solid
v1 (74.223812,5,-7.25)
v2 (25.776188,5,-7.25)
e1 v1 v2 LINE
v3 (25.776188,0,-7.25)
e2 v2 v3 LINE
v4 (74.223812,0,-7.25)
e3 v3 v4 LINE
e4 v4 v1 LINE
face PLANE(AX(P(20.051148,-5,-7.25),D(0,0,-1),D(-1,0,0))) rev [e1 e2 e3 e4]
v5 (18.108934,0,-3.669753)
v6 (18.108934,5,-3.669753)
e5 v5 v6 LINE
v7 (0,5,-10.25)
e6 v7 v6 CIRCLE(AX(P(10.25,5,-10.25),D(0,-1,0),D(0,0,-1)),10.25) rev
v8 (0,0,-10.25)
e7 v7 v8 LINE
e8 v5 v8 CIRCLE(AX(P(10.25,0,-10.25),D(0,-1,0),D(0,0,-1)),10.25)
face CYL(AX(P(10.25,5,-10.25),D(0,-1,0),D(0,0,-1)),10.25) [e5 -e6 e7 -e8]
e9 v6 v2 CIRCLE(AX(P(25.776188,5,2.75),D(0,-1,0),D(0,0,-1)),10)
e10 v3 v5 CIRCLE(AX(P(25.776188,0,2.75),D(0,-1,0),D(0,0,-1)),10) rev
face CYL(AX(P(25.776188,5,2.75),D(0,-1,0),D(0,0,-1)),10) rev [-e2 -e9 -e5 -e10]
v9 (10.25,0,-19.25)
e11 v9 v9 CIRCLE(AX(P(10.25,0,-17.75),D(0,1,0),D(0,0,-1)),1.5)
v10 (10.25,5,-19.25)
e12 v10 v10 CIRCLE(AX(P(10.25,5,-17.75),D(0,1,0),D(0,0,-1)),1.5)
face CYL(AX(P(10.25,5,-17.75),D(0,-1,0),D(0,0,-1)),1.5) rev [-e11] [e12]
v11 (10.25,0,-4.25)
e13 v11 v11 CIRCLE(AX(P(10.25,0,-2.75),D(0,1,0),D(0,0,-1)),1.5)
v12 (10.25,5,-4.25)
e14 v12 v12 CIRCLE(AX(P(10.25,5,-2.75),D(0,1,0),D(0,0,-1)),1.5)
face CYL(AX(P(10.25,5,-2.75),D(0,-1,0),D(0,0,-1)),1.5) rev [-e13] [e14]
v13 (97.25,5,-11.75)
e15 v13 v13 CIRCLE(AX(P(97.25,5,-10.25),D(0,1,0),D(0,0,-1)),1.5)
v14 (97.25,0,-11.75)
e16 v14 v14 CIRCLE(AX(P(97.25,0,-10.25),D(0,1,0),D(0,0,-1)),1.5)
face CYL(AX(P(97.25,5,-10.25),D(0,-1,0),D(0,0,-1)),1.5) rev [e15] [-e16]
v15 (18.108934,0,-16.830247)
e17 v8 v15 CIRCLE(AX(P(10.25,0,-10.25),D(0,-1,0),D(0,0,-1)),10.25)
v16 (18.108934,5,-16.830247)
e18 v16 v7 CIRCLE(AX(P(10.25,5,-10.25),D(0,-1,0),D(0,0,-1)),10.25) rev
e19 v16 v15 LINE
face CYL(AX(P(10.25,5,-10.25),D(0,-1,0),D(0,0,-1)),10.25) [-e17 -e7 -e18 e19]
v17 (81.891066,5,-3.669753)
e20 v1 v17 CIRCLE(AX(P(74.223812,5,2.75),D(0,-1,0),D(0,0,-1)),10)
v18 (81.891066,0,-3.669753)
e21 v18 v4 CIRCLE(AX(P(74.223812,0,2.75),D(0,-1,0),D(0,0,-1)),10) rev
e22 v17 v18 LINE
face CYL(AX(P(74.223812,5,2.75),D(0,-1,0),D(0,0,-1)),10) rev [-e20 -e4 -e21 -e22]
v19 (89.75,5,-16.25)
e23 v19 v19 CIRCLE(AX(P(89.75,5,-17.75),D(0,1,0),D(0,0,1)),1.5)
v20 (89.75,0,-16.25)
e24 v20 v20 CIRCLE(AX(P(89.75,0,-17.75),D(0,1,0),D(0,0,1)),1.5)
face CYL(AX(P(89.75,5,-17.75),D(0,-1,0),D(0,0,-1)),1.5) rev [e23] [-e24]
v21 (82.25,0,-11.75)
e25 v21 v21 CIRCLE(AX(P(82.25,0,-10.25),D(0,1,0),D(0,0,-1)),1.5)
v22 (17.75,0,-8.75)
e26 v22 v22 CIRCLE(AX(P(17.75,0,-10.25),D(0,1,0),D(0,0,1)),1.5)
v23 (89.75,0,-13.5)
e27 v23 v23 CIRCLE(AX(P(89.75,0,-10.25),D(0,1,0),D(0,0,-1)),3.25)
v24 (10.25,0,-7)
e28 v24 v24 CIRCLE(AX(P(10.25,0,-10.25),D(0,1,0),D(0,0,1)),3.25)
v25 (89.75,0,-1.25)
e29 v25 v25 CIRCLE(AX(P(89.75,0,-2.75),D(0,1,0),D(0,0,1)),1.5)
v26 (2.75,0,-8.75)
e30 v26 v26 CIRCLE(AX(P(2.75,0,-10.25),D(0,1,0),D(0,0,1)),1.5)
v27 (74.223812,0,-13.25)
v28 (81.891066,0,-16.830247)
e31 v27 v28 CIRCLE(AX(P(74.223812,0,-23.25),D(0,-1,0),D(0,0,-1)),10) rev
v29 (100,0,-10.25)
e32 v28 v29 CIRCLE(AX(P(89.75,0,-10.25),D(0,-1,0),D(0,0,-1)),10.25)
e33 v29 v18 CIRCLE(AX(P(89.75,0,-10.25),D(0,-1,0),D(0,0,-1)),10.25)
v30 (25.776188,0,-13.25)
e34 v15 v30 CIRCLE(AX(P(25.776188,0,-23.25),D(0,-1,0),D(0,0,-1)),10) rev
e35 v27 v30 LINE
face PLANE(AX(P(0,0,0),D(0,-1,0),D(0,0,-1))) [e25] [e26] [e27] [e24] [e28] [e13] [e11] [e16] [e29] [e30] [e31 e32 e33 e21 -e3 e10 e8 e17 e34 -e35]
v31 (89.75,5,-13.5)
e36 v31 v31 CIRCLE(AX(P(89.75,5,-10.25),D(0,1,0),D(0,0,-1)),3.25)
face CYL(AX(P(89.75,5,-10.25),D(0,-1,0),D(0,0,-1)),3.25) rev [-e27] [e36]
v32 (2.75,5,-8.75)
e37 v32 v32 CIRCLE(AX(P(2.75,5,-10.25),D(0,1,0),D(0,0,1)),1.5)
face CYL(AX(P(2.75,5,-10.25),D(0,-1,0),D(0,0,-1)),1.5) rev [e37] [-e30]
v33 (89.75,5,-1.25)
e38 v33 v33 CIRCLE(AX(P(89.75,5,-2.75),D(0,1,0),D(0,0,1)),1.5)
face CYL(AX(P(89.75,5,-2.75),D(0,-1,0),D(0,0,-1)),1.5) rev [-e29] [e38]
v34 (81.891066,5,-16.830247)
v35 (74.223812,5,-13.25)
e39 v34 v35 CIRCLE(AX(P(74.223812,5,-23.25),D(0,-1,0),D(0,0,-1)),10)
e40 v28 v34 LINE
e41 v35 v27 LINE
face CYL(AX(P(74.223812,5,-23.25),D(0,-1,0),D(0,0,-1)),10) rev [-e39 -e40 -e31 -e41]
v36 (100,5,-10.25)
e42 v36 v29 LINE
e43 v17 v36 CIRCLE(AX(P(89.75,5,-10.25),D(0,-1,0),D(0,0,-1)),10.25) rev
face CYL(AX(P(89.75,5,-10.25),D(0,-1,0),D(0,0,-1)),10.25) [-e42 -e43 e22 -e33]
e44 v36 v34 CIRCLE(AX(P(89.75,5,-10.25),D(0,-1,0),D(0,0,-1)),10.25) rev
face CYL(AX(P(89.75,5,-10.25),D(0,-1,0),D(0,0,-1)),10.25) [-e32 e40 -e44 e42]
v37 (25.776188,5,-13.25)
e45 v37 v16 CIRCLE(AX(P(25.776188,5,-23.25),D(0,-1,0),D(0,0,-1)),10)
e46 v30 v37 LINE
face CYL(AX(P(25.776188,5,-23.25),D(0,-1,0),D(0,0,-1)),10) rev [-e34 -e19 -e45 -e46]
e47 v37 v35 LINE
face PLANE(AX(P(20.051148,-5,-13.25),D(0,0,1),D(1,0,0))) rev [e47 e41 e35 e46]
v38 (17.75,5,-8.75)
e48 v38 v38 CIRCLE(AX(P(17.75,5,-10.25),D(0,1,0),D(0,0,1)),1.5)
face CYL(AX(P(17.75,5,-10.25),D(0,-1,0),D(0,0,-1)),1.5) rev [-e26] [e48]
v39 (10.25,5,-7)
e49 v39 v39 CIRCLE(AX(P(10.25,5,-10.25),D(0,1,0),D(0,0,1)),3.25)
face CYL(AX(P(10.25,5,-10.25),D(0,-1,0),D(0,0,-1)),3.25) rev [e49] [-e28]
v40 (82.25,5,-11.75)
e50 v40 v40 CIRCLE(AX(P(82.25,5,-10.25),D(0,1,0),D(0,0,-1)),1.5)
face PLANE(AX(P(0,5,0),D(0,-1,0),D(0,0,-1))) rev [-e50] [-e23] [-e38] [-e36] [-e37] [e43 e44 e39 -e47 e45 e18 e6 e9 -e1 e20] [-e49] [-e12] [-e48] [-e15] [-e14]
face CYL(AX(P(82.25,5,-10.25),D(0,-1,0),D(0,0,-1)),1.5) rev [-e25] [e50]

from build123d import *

# Parameters (mm, degrees)
SKETCH1_W           = 100
SKETCH1_H           = 20.5
SKETCH1_R           = 3.25
SKETCH1_R_2         = 1.5
BOSS_EXTRUDE1_DEPTH = 5
FILLET1_R           = 10.25
CUT_EXTRUDE1_DEPTH  = 10
FILLET2_R           = 10


with BuildPart() as part:
    # Sketch1 → Boss-Extrude1 (new body)
    with BuildSketch(Plane(origin=(0, 0, 0), x_dir=(1, 0, 0), z_dir=(0, 1, 0))):
        with Locations((50, 10.25)):
            Rectangle(SKETCH1_W, SKETCH1_H)
        with Locations(Location((10.25, 10.25, 0), (0, 0, 270))):
            Circle(SKETCH1_R, mode=Mode.SUBTRACT)
        with Locations(Location((17.75, 10.25, 0), (0, 0, 270))):
            Circle(SKETCH1_R_2, mode=Mode.SUBTRACT)
        with Locations(Location((10.25, 17.75, 0), (0, 0, 90))):
            Circle(SKETCH1_R_2, mode=Mode.SUBTRACT)
        with Locations(Location((10.25, 2.75, 0), (0, 0, 90))):
            Circle(SKETCH1_R_2, mode=Mode.SUBTRACT)
        with Locations(Location((2.75, 10.25, 0), (0, 0, 270))):
            Circle(SKETCH1_R_2, mode=Mode.SUBTRACT)
        with Locations(Location((82.25, 10.25, 0), (0, 0, 90))):
            Circle(SKETCH1_R_2, mode=Mode.SUBTRACT)
        with Locations(Location((89.75, 17.75, 0), (0, 0, 270))):
            Circle(SKETCH1_R_2, mode=Mode.SUBTRACT)
        with Locations(Location((89.75, 2.75, 0), (0, 0, 270))):
            Circle(SKETCH1_R_2, mode=Mode.SUBTRACT)
        with Locations(Location((97.25, 10.25, 0), (0, 0, 90))):
            Circle(SKETCH1_R_2, mode=Mode.SUBTRACT)
        with Locations(Location((89.75, 10.25, 0), (0, 0, 90))):
            Circle(SKETCH1_R, mode=Mode.SUBTRACT)
    extrude(amount=BOSS_EXTRUDE1_DEPTH)

    # Fillet1
    fillet1_edges = [part.edges().sort_by_distance(p)[0] for p in [
        (0, 2.5, 0),
        (0, 2.5, -20.5),
        (100, 2.5, -20.5),
        (100, 2.5, 0),
    ]]
    fillet(fillet1_edges, radius=FILLET1_R - 0.0001)  # a hair under: the kernel refuses the full size

    # Sketch2 → Cut-Extrude1 (cut)
    with BuildSketch(Plane(origin=(0, 5, 0), x_dir=(1, 0, 0), z_dir=(0, 1, 0))):
        with BuildLine():
            Line((20.051147892, 13.25), (79.948852108, 13.25))
            ThreePointArc((79.948852108, 13.25), (83.65440733, 18.490524862), (89.75, 20.5))
            Line((89.75, 20.5), (10.25, 20.5))
            ThreePointArc((10.25, 20.5), (16.34559267, 18.490524862), (20.051147892, 13.25))
        make_face()
        with BuildLine():
            Line((20.051147892, 7.25), (79.948852108, 7.25))
            ThreePointArc((79.948852108, 7.25), (83.65440733, 2.009475138), (89.75, 0))
            Line((89.75, 0), (10.25, 0))
            ThreePointArc((10.25, 0), (16.34559267, 2.009475138), (20.051147892, 7.25))
        make_face()
    extrude(amount=-CUT_EXTRUDE1_DEPTH, mode=Mode.SUBTRACT)

    # Fillet2
    fillet2_edges = [part.edges().sort_by_distance(p)[0] for p in [
        (20.051147892, 2.5, -13.25),
        (79.948852108, 2.5, -13.25),
        (79.948852108, 2.5, -7.25),
        (20.051147892, 2.5, -7.25),
    ]]
    fillet(fillet2_edges, radius=FILLET2_R)


solid = part.part
